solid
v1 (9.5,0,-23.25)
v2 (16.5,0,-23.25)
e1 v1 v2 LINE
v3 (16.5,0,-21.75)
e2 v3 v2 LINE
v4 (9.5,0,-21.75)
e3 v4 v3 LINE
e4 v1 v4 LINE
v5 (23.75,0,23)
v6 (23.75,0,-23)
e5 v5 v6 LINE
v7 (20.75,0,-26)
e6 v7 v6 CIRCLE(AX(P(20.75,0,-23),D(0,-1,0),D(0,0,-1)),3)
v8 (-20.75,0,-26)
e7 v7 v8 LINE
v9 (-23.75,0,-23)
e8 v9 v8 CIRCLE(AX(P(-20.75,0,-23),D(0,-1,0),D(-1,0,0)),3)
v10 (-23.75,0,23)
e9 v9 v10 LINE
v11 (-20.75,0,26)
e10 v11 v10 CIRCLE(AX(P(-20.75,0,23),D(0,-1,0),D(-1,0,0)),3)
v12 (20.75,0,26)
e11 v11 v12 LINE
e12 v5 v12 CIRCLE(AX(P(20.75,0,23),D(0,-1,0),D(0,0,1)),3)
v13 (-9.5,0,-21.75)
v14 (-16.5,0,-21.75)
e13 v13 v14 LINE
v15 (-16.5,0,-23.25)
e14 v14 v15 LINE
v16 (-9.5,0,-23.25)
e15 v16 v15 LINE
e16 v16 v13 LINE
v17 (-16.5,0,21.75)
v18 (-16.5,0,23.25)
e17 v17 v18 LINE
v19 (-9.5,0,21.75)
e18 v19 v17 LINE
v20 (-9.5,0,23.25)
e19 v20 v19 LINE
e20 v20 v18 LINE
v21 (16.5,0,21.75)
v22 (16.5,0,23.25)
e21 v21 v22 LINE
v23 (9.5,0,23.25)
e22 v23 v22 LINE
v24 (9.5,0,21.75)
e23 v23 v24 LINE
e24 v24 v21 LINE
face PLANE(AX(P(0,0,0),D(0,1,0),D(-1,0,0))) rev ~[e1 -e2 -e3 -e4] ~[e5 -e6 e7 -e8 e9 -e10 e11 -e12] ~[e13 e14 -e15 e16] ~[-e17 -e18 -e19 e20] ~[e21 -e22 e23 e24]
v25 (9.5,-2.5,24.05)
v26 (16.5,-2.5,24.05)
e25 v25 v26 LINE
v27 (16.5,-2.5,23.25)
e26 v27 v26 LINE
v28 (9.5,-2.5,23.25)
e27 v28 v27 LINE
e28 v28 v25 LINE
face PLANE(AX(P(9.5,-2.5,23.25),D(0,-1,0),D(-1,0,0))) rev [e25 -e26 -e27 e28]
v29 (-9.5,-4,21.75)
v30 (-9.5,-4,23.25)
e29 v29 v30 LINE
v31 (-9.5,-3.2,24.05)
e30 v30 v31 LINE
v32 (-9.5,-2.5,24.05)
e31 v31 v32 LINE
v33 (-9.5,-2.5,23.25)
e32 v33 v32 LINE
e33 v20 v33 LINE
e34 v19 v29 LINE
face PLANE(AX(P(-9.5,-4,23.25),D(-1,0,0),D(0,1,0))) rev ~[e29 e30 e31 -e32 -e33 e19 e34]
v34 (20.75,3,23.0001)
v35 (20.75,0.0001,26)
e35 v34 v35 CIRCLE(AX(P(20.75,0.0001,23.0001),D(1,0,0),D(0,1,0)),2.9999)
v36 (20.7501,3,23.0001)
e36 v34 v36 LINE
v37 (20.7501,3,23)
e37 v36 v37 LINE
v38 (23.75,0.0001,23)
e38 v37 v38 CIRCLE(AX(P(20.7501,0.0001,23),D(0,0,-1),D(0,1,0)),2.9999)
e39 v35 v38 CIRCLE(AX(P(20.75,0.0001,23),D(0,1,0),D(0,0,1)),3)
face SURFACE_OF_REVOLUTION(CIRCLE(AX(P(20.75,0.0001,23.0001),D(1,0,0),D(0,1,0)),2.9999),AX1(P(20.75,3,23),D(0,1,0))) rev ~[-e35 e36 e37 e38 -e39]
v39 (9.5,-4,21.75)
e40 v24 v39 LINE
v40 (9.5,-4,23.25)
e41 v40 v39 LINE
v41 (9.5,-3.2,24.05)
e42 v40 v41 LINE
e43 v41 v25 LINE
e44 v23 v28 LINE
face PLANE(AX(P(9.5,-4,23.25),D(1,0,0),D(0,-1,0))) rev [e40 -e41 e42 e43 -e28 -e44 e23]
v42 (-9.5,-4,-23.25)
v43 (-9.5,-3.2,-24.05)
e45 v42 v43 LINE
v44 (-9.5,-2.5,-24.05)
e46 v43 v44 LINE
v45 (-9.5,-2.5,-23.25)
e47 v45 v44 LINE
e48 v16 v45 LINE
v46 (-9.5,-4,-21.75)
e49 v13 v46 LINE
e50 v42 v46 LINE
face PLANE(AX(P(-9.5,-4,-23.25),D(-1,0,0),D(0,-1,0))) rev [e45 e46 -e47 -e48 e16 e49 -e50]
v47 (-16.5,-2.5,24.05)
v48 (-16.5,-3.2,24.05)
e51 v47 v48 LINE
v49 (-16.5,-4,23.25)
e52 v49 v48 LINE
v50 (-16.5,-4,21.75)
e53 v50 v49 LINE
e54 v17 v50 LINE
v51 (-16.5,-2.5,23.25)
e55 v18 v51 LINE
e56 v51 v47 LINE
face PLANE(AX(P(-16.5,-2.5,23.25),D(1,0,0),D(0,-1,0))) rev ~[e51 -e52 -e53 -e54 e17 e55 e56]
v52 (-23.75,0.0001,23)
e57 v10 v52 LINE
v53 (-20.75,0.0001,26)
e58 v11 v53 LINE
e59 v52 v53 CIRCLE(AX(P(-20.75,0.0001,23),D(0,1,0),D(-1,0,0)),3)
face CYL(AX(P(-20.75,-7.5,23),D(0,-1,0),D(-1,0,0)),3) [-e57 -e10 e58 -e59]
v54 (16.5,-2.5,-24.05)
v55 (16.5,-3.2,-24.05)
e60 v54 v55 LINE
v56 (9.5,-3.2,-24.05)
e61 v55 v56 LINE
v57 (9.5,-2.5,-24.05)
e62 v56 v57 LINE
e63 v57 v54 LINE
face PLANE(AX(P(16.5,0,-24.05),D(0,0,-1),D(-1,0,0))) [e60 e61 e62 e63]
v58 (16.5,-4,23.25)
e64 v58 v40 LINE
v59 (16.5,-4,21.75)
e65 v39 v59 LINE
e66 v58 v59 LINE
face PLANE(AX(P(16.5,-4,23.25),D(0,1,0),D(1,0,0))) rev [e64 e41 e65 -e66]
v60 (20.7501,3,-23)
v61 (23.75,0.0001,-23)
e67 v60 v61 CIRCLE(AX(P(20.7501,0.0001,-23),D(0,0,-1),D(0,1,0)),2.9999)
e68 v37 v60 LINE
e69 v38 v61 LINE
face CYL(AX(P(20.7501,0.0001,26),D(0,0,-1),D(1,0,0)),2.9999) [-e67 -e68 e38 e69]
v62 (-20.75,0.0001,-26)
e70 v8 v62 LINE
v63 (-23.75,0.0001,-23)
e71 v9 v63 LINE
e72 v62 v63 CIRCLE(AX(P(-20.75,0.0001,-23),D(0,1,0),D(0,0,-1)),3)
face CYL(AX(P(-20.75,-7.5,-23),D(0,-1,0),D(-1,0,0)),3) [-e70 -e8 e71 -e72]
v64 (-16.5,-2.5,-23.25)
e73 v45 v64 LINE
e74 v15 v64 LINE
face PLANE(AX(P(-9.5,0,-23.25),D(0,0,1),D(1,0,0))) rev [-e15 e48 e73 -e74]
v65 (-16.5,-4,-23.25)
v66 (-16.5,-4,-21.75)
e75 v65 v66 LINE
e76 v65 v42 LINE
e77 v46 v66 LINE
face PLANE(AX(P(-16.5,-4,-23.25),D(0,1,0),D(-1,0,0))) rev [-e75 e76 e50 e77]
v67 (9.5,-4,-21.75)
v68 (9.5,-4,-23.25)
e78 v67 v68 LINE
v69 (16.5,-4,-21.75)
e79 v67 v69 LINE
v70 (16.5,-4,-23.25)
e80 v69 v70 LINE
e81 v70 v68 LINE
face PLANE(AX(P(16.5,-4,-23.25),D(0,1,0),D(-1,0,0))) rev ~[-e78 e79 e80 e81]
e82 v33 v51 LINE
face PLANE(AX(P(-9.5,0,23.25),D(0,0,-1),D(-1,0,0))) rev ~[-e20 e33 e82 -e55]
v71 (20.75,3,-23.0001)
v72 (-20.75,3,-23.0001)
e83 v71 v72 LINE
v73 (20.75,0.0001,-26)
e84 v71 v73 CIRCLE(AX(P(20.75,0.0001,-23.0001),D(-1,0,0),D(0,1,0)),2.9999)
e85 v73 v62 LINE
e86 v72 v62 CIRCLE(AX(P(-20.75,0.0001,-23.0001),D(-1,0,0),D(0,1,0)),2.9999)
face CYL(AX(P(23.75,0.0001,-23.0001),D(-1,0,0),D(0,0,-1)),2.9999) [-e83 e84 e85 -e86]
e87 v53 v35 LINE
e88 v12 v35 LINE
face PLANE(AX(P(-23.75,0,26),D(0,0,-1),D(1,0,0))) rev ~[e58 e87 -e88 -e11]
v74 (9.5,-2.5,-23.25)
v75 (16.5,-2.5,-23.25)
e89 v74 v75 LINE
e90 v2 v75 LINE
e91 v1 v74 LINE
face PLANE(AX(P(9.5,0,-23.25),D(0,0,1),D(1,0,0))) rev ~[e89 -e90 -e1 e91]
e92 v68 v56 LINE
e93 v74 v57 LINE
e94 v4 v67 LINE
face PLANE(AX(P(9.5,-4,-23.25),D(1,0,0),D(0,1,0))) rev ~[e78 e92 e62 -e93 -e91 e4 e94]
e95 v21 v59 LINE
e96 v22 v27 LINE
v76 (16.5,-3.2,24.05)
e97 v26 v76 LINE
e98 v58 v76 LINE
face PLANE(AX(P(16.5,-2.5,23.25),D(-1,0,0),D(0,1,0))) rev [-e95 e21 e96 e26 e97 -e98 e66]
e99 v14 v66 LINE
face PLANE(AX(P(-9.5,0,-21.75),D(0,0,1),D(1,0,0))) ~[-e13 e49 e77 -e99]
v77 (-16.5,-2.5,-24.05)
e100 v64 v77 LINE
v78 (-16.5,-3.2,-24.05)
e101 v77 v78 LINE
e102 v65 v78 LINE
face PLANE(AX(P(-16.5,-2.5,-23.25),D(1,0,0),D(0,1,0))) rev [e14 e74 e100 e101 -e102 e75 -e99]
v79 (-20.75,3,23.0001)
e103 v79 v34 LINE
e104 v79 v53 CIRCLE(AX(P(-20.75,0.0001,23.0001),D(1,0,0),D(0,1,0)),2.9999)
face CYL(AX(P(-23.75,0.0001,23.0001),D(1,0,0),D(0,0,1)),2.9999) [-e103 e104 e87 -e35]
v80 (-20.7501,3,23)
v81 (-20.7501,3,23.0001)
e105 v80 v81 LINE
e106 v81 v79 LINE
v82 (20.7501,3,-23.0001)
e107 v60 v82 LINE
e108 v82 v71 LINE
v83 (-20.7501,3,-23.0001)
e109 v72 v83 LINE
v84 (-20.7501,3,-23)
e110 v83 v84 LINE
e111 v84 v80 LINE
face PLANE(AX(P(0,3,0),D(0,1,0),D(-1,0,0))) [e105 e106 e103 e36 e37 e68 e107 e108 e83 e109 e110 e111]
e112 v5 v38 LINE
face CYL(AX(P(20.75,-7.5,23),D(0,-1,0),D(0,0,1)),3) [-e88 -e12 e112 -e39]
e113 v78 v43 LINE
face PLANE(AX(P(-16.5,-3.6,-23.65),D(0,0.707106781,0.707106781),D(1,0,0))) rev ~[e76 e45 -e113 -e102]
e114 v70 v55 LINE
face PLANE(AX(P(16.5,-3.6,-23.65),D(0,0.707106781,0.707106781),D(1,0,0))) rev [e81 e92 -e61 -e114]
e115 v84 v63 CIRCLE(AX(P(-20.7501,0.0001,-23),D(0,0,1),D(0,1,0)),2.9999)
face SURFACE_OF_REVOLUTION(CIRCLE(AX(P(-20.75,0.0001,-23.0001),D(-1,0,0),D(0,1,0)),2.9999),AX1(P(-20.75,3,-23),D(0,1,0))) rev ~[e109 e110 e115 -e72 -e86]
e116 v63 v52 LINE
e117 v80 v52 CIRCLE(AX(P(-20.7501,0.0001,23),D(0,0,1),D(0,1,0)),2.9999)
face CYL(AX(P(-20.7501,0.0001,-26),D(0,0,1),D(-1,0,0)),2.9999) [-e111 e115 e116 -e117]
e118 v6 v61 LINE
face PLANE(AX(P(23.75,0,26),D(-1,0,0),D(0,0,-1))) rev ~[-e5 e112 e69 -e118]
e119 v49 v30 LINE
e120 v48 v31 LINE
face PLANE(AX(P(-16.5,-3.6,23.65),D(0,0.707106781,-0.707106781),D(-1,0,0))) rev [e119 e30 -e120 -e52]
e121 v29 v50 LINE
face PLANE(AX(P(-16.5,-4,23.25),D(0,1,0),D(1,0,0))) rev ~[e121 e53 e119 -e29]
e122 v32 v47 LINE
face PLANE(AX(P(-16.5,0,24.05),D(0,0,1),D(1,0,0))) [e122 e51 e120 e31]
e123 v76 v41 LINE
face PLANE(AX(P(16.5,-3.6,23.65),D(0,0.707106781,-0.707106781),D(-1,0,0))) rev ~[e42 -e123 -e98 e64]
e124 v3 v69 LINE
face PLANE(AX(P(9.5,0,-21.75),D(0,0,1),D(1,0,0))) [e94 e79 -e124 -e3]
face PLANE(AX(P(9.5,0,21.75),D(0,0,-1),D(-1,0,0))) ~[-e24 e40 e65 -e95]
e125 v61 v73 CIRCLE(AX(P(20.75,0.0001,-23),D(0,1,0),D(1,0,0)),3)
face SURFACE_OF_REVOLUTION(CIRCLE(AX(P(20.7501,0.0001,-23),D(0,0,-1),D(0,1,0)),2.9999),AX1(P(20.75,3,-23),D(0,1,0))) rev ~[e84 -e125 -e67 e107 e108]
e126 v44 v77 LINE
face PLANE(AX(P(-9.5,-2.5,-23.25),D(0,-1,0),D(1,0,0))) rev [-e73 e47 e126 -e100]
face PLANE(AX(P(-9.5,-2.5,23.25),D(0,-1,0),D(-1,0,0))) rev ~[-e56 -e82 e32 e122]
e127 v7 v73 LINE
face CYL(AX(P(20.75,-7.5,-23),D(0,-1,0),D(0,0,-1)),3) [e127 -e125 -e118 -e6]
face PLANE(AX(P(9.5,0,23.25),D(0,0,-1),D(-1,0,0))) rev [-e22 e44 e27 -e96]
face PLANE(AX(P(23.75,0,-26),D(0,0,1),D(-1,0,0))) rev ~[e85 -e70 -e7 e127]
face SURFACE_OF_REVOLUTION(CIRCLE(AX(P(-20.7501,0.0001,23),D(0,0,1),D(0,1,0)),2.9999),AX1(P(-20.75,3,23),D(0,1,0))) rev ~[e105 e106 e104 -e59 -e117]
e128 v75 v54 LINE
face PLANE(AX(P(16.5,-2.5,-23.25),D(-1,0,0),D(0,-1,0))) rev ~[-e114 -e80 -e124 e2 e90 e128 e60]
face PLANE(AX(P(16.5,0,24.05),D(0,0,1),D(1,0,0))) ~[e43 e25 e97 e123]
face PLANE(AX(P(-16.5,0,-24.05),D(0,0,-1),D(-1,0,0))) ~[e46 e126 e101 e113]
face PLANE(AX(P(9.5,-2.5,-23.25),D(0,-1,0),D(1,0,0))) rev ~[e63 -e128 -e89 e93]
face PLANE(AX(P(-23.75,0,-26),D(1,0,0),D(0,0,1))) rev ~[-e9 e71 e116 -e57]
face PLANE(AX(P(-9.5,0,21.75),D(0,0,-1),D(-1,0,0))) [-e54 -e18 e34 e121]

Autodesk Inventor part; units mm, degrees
ref_plane "YZ Plane" through (0, 0, 0) normal (1, 0, 0) x (0, 1, 0)
ref_plane "XZ Plane" through (0, 0, 0) normal (0, 1, 0) x (-1, 0, 0)
ref_plane "XY Plane" through (0, 0, 0) normal (0, 0, 1) x (1, 0, 0)
sketch "Sketch1" plane through (0, 0, 0) normal (0, 1, 0) x (-1, 0, 0)
  line L0 (23.75, 26) -> (-23.75, 26)
  line L1 (-23.75, 26) -> (-23.75, -26)
  line L2 (-23.75, -26) -> (23.75, -26)
  line L3 (23.75, -26) -> (23.75, 26)
  line L4 (23.75, 26) -> (-23.75, -26) construction
  line L5 (-23.75, 26) -> (23.75, -26) construction
  point P0 (0, 0)
  point P1 (0, -26)
  dimension "d0" = 47.5
  dimension "d1" = 52
extrude "Extrusion1" add sketch "Sketch1" along normal blind 3
fillet "Fillet1" radius 3 4 edges at (0, 3, -26) (-23.75, 3, 0) (0, 3, 26) (23.75, 3, 0)
sketch "Sketch2" plane through (0, 0, 0) normal (0, -1, 0) x (1, 0, 0)
  line L0 (-23.75, -26) -> (-23.75, 26) construction
  line L1 (23.75, -26) -> (-23.75, -26) construction
  line L2 (21, 23.25) -> (-21, 23.25)
  line L3 (-21, 23.25) -> (-21, -23.25)
  line L4 (-21, -23.25) -> (21, -23.25)
  line L5 (21, -23.25) -> (21, 23.25)
  line L6 (21, 23.25) -> (-21, -23.25) construction
  line L7 (-21, 23.25) -> (21, -23.25) construction
  line L8 (16.5, -23.25) -> (9.5, -23.25)
  line L9 (9.5, -23.25) -> (9.5, -21.75)
  line L10 (9.5, -21.75) -> (16.5, -21.75)
  line L11 (16.5, -21.75) -> (16.5, -23.25)
  point P0 (0, 0)
  dimension "d5" = 2.75
  dimension "d6" = 2.75
  dimension "d7" = 7
  dimension "d8" = 1.5
  dimension "d9" = 9.5
extrude "Extrusion2" add sketch "Sketch2" along normal blind 4 contours L4 L9 L10 L11
sketch "Sketch3" plane through (16.5, 0, -23.25) normal (0, 0, -1) x (-1, 0, 0)
  line L0 (7, 0) -> (7, -4) construction
  line L1 (0, -4) -> (7, -4)
  line L2 (7, -4) -> (7, -2.5)
  line L3 (7, -2.5) -> (0, -2.5)
  line L4 (0, -2.5) -> (0, -4)
  point P0 (16.5, 0)
  dimension "d12" = 1.5
extrude "Extrusion3" add sketch "Sketch3" along normal blind 0.8
chamfer "Chamfer1" distance 0.8 angle 45 1 edges at (13, -4, -24.05)
fillet "Fillet2" radius 3 4 edges at (22.8713, 2.1213, 25.1213) (-22.8713, 2.1213, 25.1213) (-22.8713, 2.1213, -25.1213) (22.8713, 2.1213, -25.1213)
mirror "Mirror1" about plane through (0, 0, 0) normal (1, 0, 0) of "Extrusion2", "Chamfer1", "Extrusion3"
mirror "Mirror2" about plane through (0, 0, 0) normal (0, 0, 1) of "Extrusion2", "Chamfer1", "Extrusion3", "Mirror1"
properties part number "capac baterie"
